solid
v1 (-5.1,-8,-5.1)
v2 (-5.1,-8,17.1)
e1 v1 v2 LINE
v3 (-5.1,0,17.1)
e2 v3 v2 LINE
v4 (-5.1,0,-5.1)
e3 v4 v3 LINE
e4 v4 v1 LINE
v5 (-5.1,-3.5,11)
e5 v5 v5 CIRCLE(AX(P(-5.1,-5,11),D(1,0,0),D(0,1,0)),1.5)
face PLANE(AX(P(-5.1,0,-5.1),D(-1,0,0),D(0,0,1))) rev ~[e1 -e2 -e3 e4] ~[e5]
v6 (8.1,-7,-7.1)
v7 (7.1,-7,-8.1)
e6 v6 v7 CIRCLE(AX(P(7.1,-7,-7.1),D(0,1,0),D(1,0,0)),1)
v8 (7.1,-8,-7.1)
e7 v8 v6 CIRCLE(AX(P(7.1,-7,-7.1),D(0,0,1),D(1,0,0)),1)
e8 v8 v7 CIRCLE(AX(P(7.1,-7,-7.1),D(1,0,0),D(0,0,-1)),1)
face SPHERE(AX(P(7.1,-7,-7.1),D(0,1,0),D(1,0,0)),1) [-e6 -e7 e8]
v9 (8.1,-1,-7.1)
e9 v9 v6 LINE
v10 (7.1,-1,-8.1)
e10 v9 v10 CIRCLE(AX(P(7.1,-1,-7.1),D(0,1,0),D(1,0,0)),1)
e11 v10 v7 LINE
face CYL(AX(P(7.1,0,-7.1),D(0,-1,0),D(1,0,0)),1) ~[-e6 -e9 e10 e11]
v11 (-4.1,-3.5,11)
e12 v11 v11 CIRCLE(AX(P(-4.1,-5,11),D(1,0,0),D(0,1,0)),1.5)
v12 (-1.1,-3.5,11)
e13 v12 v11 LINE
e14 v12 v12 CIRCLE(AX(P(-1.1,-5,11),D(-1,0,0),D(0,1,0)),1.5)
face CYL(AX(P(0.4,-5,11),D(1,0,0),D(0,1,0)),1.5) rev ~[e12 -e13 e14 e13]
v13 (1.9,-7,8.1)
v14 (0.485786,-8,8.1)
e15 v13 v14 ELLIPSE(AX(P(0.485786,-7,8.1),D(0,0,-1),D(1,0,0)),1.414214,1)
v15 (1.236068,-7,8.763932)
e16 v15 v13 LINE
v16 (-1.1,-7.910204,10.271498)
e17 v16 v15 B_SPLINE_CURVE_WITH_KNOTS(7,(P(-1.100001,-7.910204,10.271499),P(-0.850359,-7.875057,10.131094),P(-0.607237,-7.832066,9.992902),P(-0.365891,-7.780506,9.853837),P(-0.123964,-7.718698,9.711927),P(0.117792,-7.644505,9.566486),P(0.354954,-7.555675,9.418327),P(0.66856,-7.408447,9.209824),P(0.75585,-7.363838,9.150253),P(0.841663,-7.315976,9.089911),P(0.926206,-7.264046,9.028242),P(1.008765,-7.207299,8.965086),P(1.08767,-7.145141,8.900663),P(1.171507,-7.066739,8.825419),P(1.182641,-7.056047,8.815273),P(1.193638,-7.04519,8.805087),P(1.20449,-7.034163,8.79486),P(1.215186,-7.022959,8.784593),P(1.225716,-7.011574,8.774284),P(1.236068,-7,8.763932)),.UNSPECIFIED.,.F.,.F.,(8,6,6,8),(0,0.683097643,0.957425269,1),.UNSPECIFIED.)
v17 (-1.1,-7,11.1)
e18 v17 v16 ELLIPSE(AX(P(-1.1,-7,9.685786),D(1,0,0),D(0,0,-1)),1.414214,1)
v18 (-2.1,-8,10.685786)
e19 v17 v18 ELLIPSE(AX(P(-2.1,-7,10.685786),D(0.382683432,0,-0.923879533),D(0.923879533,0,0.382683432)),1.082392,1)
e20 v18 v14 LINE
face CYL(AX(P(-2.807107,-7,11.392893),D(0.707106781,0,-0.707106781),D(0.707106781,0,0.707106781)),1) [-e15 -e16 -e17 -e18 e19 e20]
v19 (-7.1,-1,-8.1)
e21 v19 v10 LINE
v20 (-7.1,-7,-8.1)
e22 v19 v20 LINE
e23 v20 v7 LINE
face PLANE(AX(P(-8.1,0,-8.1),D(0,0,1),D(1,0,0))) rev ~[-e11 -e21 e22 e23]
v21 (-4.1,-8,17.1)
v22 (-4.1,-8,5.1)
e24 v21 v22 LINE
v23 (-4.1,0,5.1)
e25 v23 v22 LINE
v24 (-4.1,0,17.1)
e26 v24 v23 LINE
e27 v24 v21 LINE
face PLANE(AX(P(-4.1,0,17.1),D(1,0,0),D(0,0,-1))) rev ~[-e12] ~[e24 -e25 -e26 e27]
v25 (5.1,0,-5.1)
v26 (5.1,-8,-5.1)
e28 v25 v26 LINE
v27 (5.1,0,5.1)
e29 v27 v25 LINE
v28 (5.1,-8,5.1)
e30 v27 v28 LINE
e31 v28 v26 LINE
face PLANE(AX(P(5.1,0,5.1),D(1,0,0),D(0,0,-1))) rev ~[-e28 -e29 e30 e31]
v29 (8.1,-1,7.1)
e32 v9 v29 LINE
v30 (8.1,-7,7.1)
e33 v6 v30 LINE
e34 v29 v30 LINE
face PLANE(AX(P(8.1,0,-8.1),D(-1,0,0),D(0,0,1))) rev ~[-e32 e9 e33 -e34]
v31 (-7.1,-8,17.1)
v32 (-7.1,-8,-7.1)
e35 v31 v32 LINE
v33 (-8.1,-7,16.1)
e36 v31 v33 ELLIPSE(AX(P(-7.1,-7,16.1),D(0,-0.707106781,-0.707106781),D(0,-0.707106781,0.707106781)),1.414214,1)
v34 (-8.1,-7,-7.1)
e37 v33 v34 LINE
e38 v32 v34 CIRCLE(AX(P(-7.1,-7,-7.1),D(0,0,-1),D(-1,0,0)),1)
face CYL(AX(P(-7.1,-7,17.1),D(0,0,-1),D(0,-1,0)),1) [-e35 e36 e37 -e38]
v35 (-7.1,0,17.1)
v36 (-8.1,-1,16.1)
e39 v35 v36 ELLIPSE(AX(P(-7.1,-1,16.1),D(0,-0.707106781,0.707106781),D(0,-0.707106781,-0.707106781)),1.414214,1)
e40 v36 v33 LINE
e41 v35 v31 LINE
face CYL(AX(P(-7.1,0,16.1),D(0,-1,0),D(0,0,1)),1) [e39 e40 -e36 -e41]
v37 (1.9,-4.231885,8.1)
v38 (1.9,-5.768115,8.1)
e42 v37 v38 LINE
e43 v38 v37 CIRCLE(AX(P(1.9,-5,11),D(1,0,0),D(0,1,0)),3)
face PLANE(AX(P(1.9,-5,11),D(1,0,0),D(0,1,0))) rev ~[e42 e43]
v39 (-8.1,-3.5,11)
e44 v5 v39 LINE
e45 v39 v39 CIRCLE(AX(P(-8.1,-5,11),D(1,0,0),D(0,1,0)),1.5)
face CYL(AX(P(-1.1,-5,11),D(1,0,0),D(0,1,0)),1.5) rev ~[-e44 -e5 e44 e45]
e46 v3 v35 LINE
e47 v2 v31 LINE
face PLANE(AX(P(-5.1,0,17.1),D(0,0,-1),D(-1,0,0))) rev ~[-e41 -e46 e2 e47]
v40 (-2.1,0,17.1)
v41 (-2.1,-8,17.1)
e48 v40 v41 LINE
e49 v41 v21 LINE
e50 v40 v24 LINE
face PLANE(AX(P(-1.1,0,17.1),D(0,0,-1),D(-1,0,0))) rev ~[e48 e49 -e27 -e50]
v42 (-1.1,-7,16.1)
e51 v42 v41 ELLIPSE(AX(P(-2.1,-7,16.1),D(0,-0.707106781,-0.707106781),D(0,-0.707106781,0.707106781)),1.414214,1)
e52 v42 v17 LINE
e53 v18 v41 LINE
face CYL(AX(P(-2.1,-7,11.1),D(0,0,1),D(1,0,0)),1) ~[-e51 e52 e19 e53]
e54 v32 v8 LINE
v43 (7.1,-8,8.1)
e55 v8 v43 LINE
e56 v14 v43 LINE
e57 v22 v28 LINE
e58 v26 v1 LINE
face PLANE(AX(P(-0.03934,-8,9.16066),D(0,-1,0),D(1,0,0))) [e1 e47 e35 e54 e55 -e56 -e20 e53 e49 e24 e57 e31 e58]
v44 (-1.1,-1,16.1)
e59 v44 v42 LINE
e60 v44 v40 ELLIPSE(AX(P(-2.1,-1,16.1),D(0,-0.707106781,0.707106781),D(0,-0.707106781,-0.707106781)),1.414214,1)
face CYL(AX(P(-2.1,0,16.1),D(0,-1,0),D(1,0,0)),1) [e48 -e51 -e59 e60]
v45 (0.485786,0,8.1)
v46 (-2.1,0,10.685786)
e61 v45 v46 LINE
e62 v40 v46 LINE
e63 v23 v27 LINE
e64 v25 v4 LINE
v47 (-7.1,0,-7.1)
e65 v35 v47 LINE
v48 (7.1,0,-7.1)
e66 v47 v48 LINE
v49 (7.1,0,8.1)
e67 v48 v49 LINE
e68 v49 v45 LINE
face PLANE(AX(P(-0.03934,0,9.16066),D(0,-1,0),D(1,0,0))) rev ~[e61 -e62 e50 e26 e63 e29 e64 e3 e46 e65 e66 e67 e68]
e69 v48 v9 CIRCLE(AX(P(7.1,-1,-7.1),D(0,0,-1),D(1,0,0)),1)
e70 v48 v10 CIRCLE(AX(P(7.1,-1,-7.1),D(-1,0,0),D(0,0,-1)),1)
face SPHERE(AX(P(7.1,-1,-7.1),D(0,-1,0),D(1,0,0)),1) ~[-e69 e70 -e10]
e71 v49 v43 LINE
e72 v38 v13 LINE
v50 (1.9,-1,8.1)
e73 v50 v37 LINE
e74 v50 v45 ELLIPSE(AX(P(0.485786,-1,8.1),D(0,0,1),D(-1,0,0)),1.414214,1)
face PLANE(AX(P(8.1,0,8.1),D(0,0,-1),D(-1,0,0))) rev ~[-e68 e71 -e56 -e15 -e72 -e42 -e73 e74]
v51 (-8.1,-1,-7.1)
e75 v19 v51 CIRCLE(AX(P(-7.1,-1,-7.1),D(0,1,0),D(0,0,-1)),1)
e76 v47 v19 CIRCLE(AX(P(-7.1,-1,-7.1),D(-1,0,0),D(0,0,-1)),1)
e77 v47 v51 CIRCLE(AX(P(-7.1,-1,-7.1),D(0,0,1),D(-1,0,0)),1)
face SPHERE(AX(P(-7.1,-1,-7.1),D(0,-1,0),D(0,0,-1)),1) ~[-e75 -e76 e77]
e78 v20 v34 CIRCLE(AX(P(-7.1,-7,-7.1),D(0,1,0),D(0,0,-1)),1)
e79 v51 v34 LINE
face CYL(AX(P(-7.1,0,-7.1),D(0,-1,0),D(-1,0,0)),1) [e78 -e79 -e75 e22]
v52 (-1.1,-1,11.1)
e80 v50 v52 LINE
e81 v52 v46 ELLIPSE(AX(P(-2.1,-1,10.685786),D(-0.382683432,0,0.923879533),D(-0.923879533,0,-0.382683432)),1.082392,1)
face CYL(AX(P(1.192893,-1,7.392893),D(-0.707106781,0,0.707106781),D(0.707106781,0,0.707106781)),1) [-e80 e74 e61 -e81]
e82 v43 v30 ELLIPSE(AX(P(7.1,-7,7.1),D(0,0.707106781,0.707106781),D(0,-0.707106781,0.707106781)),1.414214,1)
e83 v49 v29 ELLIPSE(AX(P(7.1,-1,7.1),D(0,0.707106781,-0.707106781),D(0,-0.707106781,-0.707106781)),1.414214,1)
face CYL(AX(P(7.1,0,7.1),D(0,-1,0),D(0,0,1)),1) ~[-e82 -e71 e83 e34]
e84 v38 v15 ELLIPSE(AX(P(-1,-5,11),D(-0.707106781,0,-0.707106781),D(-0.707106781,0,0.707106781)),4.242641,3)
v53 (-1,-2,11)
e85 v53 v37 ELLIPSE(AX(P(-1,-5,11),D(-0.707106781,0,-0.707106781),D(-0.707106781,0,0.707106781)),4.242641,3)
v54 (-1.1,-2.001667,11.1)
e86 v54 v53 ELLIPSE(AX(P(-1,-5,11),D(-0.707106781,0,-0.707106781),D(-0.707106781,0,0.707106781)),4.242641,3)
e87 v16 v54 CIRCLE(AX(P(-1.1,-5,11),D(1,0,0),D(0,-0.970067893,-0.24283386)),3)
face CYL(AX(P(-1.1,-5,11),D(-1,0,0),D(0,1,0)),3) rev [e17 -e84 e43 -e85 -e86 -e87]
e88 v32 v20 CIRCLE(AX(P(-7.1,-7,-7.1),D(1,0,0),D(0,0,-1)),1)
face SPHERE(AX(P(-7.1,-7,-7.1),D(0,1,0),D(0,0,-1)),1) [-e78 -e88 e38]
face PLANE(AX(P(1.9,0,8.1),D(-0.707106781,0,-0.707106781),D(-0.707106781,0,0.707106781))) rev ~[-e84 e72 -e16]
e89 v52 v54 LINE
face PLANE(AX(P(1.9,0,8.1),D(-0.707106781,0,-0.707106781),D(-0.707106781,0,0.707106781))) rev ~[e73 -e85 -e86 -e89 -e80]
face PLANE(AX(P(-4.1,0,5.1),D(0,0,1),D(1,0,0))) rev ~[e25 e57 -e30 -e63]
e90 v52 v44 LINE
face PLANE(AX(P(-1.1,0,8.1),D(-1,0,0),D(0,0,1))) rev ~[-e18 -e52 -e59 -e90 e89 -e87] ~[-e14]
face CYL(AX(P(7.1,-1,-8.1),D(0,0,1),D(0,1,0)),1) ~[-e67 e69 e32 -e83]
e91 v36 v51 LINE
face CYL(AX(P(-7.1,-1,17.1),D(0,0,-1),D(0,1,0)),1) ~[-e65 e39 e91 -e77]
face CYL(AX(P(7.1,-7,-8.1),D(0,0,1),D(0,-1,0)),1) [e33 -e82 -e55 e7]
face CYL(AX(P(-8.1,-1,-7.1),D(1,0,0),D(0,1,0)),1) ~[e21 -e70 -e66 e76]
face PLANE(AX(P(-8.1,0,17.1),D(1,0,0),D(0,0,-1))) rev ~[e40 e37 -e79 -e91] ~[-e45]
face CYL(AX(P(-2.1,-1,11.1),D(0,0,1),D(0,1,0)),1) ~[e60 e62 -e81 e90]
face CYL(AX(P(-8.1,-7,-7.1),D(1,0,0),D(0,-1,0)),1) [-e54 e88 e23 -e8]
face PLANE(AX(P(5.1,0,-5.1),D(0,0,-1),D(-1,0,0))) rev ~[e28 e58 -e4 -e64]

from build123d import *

# Parameters (mm, degrees)
F1_DEPTH    = 8
F2_R        = 1.5
F3_DEPTH    = 7.001
F4_T4_DEPTH = 8
F4_S5_R     = 1.5
F4_T6_DEPTH = 6
F5_R        = 1
F6_R        = 1
F7_R        = 3
F8_DEPTH    = 3


# Not quite as in the source:
# - a fillet or chamfer that OpenCascade refuses, or shapes differently, is made with other operations: its cross-section is extruded or revolved along the edge and cut away or added


with BuildPart() as f1:
    # F0 (on Front) → F1 (new body)
    with BuildSketch(Plane.XZ):
        Polygon((5.1, 5.1), (5.1, -5.1), (-5.1, -5.1), (-5.1, 5.1), (-5.1, 8.1), (-5.1, 17.1), (-8.1, 17.1), (-8.1, 8.1), (-8.1, -8.1), (8.1, -8.1), (8.1, 8.1), (-1.1, 8.1), (-1.1, 17.1), (-4.1, 17.1), (-4.1, 8.1), (-4.1, 5.1), align=None)
    extrude(amount=F1_DEPTH)

    # F2 (on face) → F3 (cut, through all)
    with BuildSketch(Plane.YZ.offset(-1.1)):
        with Locations((-5, 11)):
            Circle(F2_R)
    extrude(amount=-F3_DEPTH, mode=Mode.SUBTRACT)

    # F4: chamfer of 3 on 1 edges, made by hand


with BuildPart() as f4_tool2:
    # F4_s3 → F4_t4 (new body)
    with BuildSketch(Plane.XZ):
        Polygon((1.9, 8.1), (-1.1, 11.1), (-1.1, 8.1), align=None)
    extrude(amount=F4_T4_DEPTH)

    # F4_s5 → F4_t6 (cut, symmetric)
    with BuildSketch(Plane.YZ.offset(0.4)):
        with Locations((-5, 11)):
            Circle(F4_S5_R)
    extrude(amount=F4_T6_DEPTH, both=True, mode=Mode.SUBTRACT)


with BuildPart() as f1_1:
    add(f1.part)

    # F4_t1: union F4_tool2
    add(f4_tool2.part)

    # F5
    f5_edges = [f1_1.edges().sort_by_distance(p)[0] for p in [
        (8.1, -4, -8.1),
        (8.1, -4, 8.1),
        (8.1, 0, 0),
        (8.1, -8, 0),
        (-8.1, -4, -8.1),
        (0, 0, -8.1),
        (0, -8, -8.1),
        (-8.1, -4, 17.1),
        (-8.1, 0, 4.5),
        (-8.1, -8, 4.5),
        (-1.1, -4, 17.1),
        (-1.1, 0, 14.1),
        (-1.1, -8, 14.1),
    ]]
    fillet(f5_edges, radius=F5_R)

    # F6
    f6_edges = [f1_1.edges().sort_by_distance(p)[0] for p in [
        (0.4, 0, 9.6),
        (0.4, -8, 9.6),
    ]]
    fillet(f6_edges, radius=F6_R)

    # F7 (on face) → F8 (cut)
    with BuildSketch(Plane.YZ.offset(-1.1)):
        with Locations((-5, 11)):
            Circle(F7_R)
    extrude(amount=F8_DEPTH, mode=Mode.SUBTRACT)


solid = f1_1.part
